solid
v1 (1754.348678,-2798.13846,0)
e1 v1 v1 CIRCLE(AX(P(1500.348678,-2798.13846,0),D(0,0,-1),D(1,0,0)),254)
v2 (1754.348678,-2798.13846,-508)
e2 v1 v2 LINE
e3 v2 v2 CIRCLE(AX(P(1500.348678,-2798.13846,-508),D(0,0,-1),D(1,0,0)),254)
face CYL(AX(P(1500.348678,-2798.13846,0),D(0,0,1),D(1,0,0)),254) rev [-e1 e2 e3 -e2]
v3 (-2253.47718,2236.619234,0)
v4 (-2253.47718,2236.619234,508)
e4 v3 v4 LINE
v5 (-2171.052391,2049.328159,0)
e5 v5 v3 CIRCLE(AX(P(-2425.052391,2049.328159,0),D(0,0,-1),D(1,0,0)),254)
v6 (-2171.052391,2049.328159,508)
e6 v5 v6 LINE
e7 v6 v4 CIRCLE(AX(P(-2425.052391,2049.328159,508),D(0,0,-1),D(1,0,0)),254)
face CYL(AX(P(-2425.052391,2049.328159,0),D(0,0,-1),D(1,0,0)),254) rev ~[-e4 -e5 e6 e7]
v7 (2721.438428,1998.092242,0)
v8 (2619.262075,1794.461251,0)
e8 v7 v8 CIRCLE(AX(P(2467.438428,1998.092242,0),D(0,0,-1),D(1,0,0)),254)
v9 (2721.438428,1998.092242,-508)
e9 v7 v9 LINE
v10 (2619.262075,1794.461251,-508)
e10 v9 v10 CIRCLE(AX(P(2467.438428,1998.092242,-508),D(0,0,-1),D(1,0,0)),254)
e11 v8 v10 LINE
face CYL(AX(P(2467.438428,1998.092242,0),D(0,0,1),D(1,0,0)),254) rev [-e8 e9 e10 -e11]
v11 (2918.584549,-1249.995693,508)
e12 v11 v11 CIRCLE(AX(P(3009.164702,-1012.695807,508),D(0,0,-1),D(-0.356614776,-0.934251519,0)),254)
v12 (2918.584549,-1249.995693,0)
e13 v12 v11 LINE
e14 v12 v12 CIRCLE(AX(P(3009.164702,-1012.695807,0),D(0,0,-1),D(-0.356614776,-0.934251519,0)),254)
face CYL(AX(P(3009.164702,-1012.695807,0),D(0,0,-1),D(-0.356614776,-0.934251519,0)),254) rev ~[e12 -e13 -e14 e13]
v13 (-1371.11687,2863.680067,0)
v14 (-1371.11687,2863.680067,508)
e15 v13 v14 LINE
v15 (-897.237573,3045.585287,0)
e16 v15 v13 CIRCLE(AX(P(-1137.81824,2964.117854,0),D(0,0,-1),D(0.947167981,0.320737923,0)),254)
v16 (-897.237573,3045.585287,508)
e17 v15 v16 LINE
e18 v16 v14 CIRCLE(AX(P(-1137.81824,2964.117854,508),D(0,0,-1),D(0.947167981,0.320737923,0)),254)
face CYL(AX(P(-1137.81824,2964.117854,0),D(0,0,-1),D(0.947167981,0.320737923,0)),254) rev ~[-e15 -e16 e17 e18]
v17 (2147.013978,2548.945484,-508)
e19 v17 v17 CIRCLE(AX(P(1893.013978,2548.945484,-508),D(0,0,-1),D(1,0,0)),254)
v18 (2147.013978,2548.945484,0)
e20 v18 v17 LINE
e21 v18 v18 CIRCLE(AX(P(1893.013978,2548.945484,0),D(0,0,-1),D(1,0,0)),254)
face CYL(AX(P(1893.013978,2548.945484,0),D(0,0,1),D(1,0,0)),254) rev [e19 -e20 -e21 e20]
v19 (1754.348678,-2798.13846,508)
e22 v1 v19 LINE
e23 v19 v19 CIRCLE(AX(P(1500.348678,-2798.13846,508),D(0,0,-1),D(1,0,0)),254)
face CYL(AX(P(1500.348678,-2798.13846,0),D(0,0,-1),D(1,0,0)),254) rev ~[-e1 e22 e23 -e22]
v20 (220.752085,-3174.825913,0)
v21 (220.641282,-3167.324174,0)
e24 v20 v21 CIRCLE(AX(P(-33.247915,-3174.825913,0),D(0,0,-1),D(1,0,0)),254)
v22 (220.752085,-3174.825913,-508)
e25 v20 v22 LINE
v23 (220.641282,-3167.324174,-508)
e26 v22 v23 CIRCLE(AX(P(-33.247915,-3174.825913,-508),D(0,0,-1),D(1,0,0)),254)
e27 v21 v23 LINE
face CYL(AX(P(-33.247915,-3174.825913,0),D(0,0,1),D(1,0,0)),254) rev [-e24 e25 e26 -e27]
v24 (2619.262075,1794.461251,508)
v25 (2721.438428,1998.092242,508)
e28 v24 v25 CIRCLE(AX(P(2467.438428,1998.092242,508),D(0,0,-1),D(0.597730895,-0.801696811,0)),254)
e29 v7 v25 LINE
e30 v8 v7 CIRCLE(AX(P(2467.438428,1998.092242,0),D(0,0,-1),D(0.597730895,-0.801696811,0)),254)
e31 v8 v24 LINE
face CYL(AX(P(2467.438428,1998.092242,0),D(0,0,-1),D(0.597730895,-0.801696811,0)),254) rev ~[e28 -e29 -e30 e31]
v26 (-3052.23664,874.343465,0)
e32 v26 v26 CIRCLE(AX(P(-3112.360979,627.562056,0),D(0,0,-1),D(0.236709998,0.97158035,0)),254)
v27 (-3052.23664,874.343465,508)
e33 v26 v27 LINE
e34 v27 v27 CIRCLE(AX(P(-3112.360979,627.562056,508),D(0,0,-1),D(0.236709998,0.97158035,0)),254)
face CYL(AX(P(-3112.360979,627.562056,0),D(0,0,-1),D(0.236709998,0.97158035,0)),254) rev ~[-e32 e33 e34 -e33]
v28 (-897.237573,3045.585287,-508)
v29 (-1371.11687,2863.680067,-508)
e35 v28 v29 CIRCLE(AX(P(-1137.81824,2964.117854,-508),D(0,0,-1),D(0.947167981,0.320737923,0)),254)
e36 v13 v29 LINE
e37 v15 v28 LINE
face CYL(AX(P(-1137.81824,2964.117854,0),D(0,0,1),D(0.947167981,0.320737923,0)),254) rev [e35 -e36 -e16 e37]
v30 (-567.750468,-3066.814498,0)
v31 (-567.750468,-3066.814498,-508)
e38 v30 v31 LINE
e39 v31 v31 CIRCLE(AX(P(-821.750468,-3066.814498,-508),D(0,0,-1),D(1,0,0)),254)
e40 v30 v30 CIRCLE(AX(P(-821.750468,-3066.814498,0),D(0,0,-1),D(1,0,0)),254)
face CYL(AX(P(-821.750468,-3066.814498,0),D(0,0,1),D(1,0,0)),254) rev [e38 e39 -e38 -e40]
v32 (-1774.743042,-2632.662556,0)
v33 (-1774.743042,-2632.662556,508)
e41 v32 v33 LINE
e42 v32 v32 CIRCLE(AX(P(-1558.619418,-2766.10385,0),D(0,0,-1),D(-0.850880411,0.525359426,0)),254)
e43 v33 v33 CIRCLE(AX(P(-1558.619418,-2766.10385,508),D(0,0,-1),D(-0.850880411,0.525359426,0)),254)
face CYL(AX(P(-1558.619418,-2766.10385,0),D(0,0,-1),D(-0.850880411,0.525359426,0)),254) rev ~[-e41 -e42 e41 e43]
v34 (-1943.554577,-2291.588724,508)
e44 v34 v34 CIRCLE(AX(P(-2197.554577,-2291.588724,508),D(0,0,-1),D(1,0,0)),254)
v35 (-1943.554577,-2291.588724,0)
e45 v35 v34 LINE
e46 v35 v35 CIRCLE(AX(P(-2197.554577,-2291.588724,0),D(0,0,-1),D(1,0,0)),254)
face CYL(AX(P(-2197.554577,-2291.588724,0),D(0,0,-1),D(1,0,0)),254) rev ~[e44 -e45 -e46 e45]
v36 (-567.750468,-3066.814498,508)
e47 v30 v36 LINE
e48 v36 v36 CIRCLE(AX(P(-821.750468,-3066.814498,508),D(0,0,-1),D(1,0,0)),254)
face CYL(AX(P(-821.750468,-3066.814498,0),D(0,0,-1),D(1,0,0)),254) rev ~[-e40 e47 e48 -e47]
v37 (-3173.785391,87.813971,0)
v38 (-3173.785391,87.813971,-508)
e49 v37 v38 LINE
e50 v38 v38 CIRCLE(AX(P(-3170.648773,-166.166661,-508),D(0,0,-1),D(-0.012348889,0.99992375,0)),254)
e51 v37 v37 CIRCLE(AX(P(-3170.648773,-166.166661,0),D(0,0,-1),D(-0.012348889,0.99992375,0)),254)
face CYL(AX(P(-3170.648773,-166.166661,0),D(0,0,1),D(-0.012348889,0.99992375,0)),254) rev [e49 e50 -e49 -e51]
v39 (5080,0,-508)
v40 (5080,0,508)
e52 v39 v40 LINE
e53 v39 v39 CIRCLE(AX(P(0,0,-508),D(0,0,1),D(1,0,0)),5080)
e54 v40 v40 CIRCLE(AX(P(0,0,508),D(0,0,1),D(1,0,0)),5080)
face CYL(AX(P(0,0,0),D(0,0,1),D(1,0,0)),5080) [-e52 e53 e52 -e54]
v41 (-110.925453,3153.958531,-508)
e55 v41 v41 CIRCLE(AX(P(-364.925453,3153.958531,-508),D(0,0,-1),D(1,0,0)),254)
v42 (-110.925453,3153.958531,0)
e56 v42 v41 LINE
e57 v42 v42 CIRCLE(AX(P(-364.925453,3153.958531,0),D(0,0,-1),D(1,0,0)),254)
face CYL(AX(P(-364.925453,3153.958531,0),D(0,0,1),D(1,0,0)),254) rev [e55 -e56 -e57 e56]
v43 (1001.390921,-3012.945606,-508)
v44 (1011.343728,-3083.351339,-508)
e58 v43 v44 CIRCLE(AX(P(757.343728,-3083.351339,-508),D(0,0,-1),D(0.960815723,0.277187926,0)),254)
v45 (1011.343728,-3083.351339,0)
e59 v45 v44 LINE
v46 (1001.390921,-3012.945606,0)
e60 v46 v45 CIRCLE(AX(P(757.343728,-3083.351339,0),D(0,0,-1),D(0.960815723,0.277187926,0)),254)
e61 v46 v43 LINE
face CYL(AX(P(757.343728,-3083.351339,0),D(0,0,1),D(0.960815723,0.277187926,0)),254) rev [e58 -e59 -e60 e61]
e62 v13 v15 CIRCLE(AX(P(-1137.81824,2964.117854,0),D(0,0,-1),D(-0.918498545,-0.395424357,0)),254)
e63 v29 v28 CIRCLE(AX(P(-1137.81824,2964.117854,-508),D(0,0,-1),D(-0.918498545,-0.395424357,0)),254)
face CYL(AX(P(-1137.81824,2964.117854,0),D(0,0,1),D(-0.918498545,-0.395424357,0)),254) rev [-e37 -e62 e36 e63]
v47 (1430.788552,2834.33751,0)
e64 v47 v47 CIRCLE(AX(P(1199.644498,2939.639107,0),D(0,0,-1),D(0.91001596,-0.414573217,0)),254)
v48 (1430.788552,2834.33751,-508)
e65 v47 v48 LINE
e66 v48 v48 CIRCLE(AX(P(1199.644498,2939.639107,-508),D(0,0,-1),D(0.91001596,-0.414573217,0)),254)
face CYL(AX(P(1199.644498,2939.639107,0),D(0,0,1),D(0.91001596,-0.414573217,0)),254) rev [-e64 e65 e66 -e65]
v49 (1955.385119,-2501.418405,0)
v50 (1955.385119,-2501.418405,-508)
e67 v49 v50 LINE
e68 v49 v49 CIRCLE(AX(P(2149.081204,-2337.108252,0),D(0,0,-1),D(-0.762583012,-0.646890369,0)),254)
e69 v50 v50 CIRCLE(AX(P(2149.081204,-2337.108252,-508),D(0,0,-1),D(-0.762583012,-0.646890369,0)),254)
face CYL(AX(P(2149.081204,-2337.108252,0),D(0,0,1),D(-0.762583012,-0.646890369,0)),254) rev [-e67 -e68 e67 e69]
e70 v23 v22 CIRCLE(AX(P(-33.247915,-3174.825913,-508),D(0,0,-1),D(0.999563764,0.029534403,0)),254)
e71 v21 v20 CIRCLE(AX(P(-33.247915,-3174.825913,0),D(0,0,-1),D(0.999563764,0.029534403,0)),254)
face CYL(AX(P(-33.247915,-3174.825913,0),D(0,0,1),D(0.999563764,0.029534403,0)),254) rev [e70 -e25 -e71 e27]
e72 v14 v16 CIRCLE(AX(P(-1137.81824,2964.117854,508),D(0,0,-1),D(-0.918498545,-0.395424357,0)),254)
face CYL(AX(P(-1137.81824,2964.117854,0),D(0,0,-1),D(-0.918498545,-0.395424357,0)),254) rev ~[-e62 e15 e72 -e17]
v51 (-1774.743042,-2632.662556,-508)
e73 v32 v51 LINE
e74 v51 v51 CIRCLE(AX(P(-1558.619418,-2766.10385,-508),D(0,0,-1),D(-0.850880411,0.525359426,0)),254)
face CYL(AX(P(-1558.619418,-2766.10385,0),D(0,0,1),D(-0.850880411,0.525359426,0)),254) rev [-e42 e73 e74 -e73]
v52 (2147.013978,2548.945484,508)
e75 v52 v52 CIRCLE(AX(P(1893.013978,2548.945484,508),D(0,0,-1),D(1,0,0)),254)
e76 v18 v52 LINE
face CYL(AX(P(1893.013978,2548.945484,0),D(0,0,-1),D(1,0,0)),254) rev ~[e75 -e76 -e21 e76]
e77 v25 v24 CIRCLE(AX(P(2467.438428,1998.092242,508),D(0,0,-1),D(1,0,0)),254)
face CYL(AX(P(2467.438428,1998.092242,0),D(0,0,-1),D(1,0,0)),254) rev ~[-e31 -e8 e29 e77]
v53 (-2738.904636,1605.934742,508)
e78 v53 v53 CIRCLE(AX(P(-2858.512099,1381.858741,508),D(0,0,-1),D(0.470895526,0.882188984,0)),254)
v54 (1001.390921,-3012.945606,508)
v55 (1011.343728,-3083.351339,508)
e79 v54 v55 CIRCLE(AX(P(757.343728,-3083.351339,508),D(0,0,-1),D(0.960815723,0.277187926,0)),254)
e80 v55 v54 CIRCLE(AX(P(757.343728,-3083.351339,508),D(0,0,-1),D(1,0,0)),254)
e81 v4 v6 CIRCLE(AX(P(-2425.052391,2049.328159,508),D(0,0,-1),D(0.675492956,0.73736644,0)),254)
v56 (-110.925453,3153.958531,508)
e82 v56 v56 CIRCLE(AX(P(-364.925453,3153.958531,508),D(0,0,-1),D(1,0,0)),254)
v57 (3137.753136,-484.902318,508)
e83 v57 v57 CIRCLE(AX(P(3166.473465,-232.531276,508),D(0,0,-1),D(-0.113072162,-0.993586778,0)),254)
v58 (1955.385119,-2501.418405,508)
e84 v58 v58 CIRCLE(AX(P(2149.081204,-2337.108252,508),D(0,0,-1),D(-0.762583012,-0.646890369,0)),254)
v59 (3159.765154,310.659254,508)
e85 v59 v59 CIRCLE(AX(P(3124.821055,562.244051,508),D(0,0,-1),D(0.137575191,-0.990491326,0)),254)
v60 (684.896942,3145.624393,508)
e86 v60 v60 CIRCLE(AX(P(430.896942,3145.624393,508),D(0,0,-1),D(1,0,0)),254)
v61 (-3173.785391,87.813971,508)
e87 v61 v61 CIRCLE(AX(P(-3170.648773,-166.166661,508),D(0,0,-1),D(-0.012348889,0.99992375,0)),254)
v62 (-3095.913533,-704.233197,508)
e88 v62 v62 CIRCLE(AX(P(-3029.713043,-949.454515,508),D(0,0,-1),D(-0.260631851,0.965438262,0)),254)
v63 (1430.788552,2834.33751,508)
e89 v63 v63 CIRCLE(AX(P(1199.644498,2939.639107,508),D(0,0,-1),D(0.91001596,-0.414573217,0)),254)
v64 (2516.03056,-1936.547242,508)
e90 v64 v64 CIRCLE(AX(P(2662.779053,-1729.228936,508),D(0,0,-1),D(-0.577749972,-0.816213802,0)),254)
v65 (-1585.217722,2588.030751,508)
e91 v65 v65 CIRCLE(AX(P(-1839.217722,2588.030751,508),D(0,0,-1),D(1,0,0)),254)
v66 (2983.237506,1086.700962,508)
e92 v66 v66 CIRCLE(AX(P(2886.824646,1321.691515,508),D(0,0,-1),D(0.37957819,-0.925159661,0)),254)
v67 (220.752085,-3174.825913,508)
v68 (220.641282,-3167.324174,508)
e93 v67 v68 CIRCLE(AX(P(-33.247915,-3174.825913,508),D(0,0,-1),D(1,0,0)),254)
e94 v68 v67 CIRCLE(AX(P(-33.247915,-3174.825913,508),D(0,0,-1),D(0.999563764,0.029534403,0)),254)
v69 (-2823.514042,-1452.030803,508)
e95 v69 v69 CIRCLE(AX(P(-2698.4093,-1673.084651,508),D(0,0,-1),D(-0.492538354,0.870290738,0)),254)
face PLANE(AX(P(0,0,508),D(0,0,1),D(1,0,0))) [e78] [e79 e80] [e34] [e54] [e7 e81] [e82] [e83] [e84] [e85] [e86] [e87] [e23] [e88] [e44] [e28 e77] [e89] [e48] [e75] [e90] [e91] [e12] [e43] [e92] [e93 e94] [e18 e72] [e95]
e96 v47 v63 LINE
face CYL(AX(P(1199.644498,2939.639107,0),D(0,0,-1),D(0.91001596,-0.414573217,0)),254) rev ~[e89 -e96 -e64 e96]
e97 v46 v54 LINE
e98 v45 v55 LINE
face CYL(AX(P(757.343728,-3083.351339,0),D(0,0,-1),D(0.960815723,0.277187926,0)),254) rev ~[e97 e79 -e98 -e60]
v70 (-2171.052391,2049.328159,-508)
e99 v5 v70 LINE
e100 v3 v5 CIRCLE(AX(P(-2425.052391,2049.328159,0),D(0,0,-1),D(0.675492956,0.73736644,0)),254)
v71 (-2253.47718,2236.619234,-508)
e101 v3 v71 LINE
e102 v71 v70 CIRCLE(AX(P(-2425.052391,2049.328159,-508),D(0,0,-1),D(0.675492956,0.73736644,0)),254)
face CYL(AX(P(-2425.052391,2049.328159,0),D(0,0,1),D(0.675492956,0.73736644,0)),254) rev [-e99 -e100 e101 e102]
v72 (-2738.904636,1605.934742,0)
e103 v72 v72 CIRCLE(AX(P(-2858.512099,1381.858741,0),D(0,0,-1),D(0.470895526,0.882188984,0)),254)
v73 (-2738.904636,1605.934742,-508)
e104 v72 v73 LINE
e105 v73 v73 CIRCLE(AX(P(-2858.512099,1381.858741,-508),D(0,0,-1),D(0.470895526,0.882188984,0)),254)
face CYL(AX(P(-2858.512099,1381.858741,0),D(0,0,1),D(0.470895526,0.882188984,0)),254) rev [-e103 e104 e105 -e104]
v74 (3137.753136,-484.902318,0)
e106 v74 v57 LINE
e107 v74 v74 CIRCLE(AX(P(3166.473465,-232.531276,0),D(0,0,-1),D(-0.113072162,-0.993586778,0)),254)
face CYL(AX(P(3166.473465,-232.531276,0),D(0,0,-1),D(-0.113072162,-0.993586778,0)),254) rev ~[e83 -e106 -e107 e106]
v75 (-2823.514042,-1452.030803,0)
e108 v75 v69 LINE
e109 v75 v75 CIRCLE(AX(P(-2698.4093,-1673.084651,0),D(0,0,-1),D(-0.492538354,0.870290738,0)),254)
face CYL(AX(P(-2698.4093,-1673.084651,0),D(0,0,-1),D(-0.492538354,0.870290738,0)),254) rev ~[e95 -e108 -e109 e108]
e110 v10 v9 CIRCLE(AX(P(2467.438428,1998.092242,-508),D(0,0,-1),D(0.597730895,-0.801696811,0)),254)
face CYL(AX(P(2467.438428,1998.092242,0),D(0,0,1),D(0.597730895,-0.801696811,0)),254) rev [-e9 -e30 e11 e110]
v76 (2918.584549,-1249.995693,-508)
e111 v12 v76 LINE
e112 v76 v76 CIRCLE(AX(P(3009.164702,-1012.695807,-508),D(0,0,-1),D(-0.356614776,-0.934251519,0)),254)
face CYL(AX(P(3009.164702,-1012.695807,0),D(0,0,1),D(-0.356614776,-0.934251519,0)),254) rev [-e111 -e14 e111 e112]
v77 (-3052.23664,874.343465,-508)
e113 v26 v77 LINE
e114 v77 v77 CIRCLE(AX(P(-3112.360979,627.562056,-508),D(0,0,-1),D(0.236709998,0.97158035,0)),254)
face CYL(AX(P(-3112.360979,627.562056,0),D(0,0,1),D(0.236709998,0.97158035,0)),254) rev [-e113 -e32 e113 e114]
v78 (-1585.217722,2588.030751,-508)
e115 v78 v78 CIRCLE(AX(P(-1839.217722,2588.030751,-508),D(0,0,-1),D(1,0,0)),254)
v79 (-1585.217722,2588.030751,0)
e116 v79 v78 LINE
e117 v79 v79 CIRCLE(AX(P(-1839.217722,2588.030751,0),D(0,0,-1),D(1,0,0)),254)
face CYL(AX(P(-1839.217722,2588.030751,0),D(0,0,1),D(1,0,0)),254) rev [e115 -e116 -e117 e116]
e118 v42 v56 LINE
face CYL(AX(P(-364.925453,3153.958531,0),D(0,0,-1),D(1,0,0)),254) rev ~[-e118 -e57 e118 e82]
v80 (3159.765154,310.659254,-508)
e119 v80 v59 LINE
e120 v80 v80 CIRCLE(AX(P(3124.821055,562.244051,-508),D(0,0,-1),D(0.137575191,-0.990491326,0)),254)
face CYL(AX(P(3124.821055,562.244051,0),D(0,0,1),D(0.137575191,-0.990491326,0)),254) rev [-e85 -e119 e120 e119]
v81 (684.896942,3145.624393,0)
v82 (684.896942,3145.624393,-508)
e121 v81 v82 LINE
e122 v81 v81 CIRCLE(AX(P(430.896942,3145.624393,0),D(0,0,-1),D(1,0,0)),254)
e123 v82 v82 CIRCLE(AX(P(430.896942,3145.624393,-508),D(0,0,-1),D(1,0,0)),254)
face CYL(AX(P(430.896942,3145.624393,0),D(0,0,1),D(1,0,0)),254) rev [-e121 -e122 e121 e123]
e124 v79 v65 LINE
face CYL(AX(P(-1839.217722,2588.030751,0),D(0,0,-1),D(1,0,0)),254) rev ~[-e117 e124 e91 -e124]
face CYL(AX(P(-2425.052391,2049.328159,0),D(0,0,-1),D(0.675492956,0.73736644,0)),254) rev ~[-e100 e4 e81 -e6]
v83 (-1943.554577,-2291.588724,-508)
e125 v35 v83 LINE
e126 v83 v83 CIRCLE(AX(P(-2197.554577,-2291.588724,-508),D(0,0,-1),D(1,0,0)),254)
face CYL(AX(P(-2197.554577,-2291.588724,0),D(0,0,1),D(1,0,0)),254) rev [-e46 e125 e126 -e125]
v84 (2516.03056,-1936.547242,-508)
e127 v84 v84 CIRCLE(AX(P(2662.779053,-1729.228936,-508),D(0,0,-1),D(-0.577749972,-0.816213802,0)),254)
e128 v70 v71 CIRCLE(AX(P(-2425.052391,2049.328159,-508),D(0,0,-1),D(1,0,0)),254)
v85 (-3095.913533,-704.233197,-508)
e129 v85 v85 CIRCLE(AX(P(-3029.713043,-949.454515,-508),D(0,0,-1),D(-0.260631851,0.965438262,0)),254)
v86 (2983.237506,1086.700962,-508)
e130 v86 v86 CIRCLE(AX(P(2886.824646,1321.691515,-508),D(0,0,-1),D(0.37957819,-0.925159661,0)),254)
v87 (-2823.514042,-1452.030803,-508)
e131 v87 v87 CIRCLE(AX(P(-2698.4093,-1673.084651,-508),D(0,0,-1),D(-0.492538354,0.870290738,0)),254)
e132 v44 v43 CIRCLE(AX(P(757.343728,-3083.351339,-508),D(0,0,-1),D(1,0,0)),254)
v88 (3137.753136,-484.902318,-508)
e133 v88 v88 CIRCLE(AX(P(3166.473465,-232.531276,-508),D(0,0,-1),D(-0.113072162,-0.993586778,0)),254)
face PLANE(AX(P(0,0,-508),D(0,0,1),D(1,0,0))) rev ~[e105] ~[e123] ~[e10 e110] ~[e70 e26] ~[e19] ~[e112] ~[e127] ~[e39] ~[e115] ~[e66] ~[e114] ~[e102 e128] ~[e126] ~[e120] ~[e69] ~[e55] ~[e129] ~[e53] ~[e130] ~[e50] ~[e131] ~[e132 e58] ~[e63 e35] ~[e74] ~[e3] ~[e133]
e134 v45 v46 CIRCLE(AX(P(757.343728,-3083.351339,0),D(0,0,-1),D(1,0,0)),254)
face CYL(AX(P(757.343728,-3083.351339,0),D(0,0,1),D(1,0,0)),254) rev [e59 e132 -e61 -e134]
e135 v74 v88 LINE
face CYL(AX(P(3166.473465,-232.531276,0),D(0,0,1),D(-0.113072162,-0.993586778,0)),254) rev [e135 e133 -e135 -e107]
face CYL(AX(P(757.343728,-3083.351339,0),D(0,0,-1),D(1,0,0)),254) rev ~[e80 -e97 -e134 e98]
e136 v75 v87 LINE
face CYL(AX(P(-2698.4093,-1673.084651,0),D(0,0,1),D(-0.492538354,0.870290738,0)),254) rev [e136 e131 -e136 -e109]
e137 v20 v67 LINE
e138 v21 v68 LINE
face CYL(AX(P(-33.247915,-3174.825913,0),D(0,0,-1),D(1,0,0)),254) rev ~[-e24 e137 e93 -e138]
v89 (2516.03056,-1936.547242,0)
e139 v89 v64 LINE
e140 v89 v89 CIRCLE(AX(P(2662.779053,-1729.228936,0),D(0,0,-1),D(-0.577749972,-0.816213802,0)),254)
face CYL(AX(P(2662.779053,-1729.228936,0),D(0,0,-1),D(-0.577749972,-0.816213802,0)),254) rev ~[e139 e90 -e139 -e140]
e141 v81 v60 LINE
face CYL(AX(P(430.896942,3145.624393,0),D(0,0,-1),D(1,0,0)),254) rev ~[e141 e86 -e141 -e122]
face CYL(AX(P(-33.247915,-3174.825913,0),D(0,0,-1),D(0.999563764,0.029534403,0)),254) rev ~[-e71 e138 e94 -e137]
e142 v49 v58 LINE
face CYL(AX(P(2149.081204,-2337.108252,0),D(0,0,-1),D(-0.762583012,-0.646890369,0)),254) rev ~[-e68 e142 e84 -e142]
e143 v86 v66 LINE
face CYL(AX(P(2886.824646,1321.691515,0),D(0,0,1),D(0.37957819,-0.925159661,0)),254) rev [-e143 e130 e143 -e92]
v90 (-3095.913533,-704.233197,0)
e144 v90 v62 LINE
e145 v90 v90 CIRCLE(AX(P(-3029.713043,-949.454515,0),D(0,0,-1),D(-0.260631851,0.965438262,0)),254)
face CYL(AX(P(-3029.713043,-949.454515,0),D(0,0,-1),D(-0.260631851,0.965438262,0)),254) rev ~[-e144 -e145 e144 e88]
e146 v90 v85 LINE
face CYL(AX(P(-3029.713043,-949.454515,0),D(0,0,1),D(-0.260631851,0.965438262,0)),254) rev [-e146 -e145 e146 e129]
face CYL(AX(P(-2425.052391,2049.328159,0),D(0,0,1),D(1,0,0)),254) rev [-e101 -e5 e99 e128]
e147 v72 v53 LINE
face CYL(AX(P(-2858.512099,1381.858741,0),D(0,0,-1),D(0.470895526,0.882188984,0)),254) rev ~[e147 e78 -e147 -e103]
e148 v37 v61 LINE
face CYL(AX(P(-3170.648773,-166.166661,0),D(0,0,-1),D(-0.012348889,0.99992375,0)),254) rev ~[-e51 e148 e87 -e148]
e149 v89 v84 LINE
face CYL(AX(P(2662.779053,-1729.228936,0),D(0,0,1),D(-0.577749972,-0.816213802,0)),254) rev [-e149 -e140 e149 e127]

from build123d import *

# Parameters (mm, degrees)
F0_R     = 5080
F1_DEPTH = 508


# Not quite as in the source:
# - a feature names something its author has since deleted; it is built from what else it names


with BuildPart() as f1:
    # F0 (on Top) → F1 (new body, symmetric)
    with BuildSketch(Plane.XY):
        Circle(F0_R)
        with BuildLine():
            ThreePointArc((3159.7651539423, 310.6592537359), (3170.6487728458, 166.1666610714), (3174.9283642102, 21.3279659893))
            ThreePointArc((3174.9283642102, 21.3279659892), (3349.0433755669, -55.9407103788), (3420.4734651877, -232.5312758802))
            ThreePointArc((3420.4734651877, -232.5312758802), (3335.6199052673, -422.018694482), (3137.7531359879, -484.902317584))
            ThreePointArc((3137.7531359879, -484.902317584), (3112.360979424, -627.5620557037), (3080.486200819, -768.9146679337))
            ThreePointArc((3080.486200819, -768.9146679337), (3212.4276604766, -860.3797880933), (3263.1647017804, -1012.6958070214))
            ThreePointArc((3263.1647017804, -1012.6958070214), (3153.2283007654, -1221.8887310114), (2918.5845486504, -1249.9956929441))
            ThreePointArc((2918.5845486504, -1249.9956929442), (2858.512099202, -1381.8587405071), (2792.4857601946, -1510.8435653999))
            ThreePointArc((2792.4857601946, -1510.8435654), (2883.5294819577, -1603.5895784257), (2916.7790532267, -1729.2289361727))
            ThreePointArc((2916.7790532267, -1729.2289361727), (2779.4878421015, -1954.8282681739), (2516.0305603182, -1936.547241754))
            ThreePointArc((2516.0305603182, -1936.5472417539), (2425.052390915, -2049.3281585235), (2329.0231692129, -2157.8406051582))
            ThreePointArc((2329.0231692129, -2157.8406051582), (2383.8377363773, -2240.1269627642), (2403.0812037424, -2337.1082516052))
            ThreePointArc((2403.0812037424, -2337.1082516052), (2236.5946151881, -2575.5561553853), (1955.385118568, -2501.4184052418))
            ThreePointArc((1955.385118568, -2501.4184052419), (1839.217722188, -2588.0307514382), (1719.2194869615, -2669.2525837118))
            ThreePointArc((1719.2194869615, -2669.2525837117), (1745.4090642416, -2731.3446932303), (1754.3486784592, -2798.1384603063))
            ThreePointArc((1754.3486784592, -2798.1384603063), (1557.2865736992, -3045.674469981), (1271.8756384148, -2909.116250755))
            ThreePointArc((1271.8756384147, -2909.116250755), (1137.8182398063, -2964.1178541286), (1001.3909214974, -3012.9456056064))
            ThreePointArc((1001.3909214974, -3012.9456056064), (1008.843218066, -3047.7984710094), (1011.343727812, -3083.3513387131))
            ThreePointArc((1011.343727812, -3083.3513387131), (782.8081622254, -3336.0716635388), (508.4495342686, -3134.0236232521))
            ThreePointArc((508.4495342686, -3134.0236232521), (364.9254528148, -3153.9585307813), (220.6412815773, -3167.3241742619))
            ThreePointArc((220.6412815773, -3167.3241742619), (220.7243829568, -3171.0746343661), (220.7520854309, -3174.8259127355))
            ThreePointArc((220.7520854309, -3174.8259127355), (-39.6585303247, -3428.745002222), (-286.9243240623, -3162.0087653676))
            ThreePointArc((-286.9243240623, -3162.0087653676), (-430.8969424789, -3145.6243934968), (-573.972061526, -3122.6881164451))
            ThreePointArc((-573.9720615261, -3122.6881164451), (-887.4905056565, -3312.1596583452), (-1064.2696718785, -2991.3132677003))
            ThreePointArc((-1064.2696718784, -2991.3132677003), (-1199.6444981486, -2939.6391067717), (-1332.5206290822, -2881.8420798285))
            ThreePointArc((-1332.5206290822, -2881.8420798285), (-1683.3089711463, -2987.3921583311), (-1774.7430421005, -2632.6625561427))
            ThreePointArc((-1774.7430421005, -2632.6625561427), (-1893.0139780159, -2548.9454837318), (-2007.3420248451, -2459.9193066625))
            ThreePointArc((-2007.342024845, -2459.9193066625), (-2373.3589432016, -2474.9158221493), (-2373.702779939, -2108.5919739271))
            ThreePointArc((-2373.7027799391, -2108.591973927), (-2467.4384276259, -1998.0922415832), (-2556.0347386993, -1883.4307565086))
            ThreePointArc((-2556.0347386993, -1883.4307565086), (-2914.282044252, -1806.9314227581), (-2823.5140422458, -1452.0308031309))
            ThreePointArc((-2823.5140422458, -1452.0308031309), (-2886.8246462244, -1321.6915154268), (-2944.1223894829, -1188.5993251494))
            ThreePointArc((-2944.1223894829, -1188.5993251494), (-3272.0900864823, -1025.4108766461), (-3095.91353312, -704.2331967781))
            ThreePointArc((-3095.91353312, -704.2331967781), (-3124.8210553023, -562.2440505147), (-3147.2200028105, -419.0838268286))
            ThreePointArc((-3147.2200028105, -419.0838268285), (-3424.3006746734, -179.4599939571), (-3173.7853907348, 87.8139713167))
            ThreePointArc((-3173.7853907348, 87.8139713168), (-3166.4734651876, 232.5312758803), (-3152.5662086961, 376.7642496146))
            ThreePointArc((-3152.5662086961, 376.7642496145), (-3361.3498577779, 677.76702016), (-3052.2366398835, 874.3434646365))
            ThreePointArc((-3052.2366398835, 874.3434646365), (-3009.1647017804, 1012.6958070214), (-2959.8250853618, 1148.9388426122))
            ThreePointArc((-2959.8250853618, 1148.9388426122), (-3087.1930671381, 1492.4074397477), (-2738.9046356072, 1605.9347424628))
            ThreePointArc((-2738.9046356072, 1605.9347424629), (-2662.7790532267, 1729.2289361727), (-2581.107266439, 1848.9213826271))
            ThreePointArc((-2581.107266439, 1848.9213826271), (-2619.0565821882, 2213.2744112054), (-2253.4771800891, 2236.6192342054))
            ThreePointArc((-2253.4771800891, 2236.6192342054), (-2149.0812037424, 2337.1082516052), (-2040.2089853173, 2432.7293923144))
            ThreePointArc((-2040.2089853173, 2432.7293923144), (-1986.355139963, 2795.0732115532), (-1626.4554656367, 2726.7687137527))
            ThreePointArc((-1626.4554656367, 2726.7687137527), (-1500.3486784592, 2798.1384603064), (-1371.1168702844, 2863.6800673297))
            ThreePointArc((-1371.1168702844, 2863.6800673297), (-1228.8436989908, 3201.2472824589), (-897.2375725935, 3045.5852866611))
            ThreePointArc((-897.2375725935, 3045.5852866611), (-757.343727812, 3083.3513387131), (-615.8724396764, 3114.6951918361))
            ThreePointArc((-615.8724396764, 3114.6951918361), (-394.11948904, 3406.2752132438), (-111.6429430553, 3173.0365351294))
            ThreePointArc((-111.6429430552, 3173.0365351294), (33.2479145692, 3174.8259127355), (178.0695213369, 3170.0025623918))
            ThreePointArc((178.0695213369, 3170.0025623918), (443.1001189081, 3399.3310794258), (684.8969424789, 3145.6243934968))
            ThreePointArc((684.8969424789, 3145.6243934968), (683.9124547508, 3123.2827160797), (680.9666231891, 3101.1142284834))
            ThreePointArc((680.9666231891, 3101.1142284834), (821.7504682005, 3066.8144984678), (960.8227194307, 3026.1270134986))
            ThreePointArc((960.8227194307, 3026.1270134986), (1243.5493282112, 3189.815776142), (1453.6444981486, 2939.6391067717))
            ThreePointArc((1453.6444981486, 2939.6391067717), (1447.8647528602, 2885.7623478592), (1430.7885520784, 2834.3375097615))
            ThreePointArc((1430.7885520784, 2834.3375097615), (1558.619417728, 2766.1038503066), (1683.2038924038, 2692.1087750306))
            ThreePointArc((1683.2038924039, 2692.1087750306), (1967.9280563141, 2791.6467010191), (2147.0139780158, 2548.9454837318))
            ThreePointArc((2147.0139780158, 2548.9454837318), (2132.5243934708, 2464.3833119964), (2090.7087741685, 2389.4689413371))
            ThreePointArc((2090.7087741685, 2389.4689413372), (2197.5545770385, 2291.5887242123), (2299.8231744264, 2188.9354413438))
            ThreePointArc((2299.8231744264, 2188.9354413439), (2572.1803143936, 2229.4904636082), (2721.4384276259, 1998.0922415832))
            ThreePointArc((2721.4384276259, 1998.0922415832), (2694.4617814958, 1884.1782529882), (2619.2620748886, 1794.4612514765))
            ThreePointArc((2619.2620748885, 1794.4612514766), (2698.4093002333, 1673.084650702), (2771.9361082418, 1548.2232435361))
            ThreePointArc((2771.9361082418, 1548.2232435361), (3019.7424993376, 1538.1374539976), (3140.8246462244, 1321.6915154268))
            ThreePointArc((3140.8246462244, 1321.6915154268), (3097.7806446017, 1180.2222016211), (2983.2375064713, 1086.7009616187))
            ThreePointArc((2983.2375064713, 1086.7009616187), (3029.7130430392, 949.4545154131), (3069.8781019084, 810.2304853702))
            ThreePointArc((3069.8781019084, 810.2304853702), (3283.818680816, 760.3242238815), (3378.8210553023, 562.2440505147))
            ThreePointArc((3378.8210553023, 562.2440505147), (3316.3827960735, 395.4504670868), (3159.7651539423, 310.6592537359))
        make_face(mode=Mode.SUBTRACT)
        with BuildLine():
            ThreePointArc((3137.7531359879, -484.902317584), (2913.1555879726, -213.9287738098), (3174.9283642102, 21.3279659892))
            ThreePointArc((3174.9283642102, 21.3279659893), (3170.6487728458, 166.1666610714), (3159.7651539423, 310.6592537359))
            ThreePointArc((3159.7651539423, 310.6592537359), (2874.8353708782, 517.2645264735), (3069.8781019084, 810.2304853702))
            ThreePointArc((3069.8781019084, 810.2304853702), (3029.7130430392, 949.4545154131), (2983.2375064713, 1086.7009616187))
            ThreePointArc((2983.2375064713, 1086.7009616187), (2655.8786745265, 1215.9561941926), (2771.9361082418, 1548.2232435361))
            ThreePointArc((2771.9361082418, 1548.2232435361), (2698.4093002333, 1673.084650702), (2619.2620748885, 1794.4612514766))
            ThreePointArc((2619.2620748886, 1794.4612514765), (2270.0433534158, 1838.2448622566), (2299.8231744264, 2188.9354413439))
            ThreePointArc((2299.8231744264, 2188.9354413438), (2197.5545770385, 2291.5887242123), (2090.7087741685, 2389.4689413372))
            ThreePointArc((2090.7087741685, 2389.4689413371), (1741.5728597746, 2345.0298450332), (1683.2038924039, 2692.1087750306))
            ThreePointArc((1683.2038924038, 2692.1087750306), (1558.619417728, 2766.1038503066), (1430.7885520784, 2834.3375097615))
            ThreePointArc((1430.7885520784, 2834.3375097615), (1103.6729382967, 2704.46797823), (960.8227194307, 3026.1270134986))
            ThreePointArc((960.8227194307, 3026.1270134986), (821.7504682005, 3066.8144984678), (680.9666231891, 3101.1142284834))
            ThreePointArc((680.9666231891, 3101.1142284834), (396.4251870806, 2893.9744420171), (178.0695213369, 3170.0025623918))
            ThreePointArc((178.0695213369, 3170.0025623918), (33.2479145692, 3174.8259127355), (-111.6429430552, 3173.0365351294))
            ThreePointArc((-111.6429430553, 3173.0365351294), (-111.1048887554, 3163.5042764587), (-110.9254528149, 3153.9585307813))
            ThreePointArc((-110.9254528149, 3153.9585307813), (-345.2345242287, 2900.7229342878), (-615.8724396764, 3114.6951918361))
            ThreePointArc((-615.8724396764, 3114.6951918361), (-757.343727812, 3083.3513387131), (-897.2375725935, 3045.5852866611))
            ThreePointArc((-897.2375725935, 3045.5852866611), (-887.1955258795, 3005.4004807889), (-883.8182398063, 2964.1178541286))
            ThreePointArc((-883.8182398063, 2964.1178541286), (-1086.5437439113, 2715.3470237029), (-1371.1168702844, 2863.6800673297))
            ThreePointArc((-1371.1168702844, 2863.6800673297), (-1500.3486784592, 2798.1384603064), (-1626.4554656367, 2726.7687137527))
            ThreePointArc((-1626.4554656367, 2726.7687137527), (-1595.7453283073, 2660.3992073978), (-1585.217722188, 2588.0307514382))
            ThreePointArc((-1585.217722188, 2588.0307514382), (-1757.1682884144, 2347.6479516845), (-2040.2089853173, 2432.7293923144))
            ThreePointArc((-2040.2089853173, 2432.7293923144), (-2149.0812037424, 2337.1082516052), (-2253.4771800891, 2236.6192342054))
            ThreePointArc((-2253.4771800891, 2236.6192342054), (-2192.5700221752, 2151.6411500012), (-2171.052390915, 2049.3281585235))
            ThreePointArc((-2171.052390915, 2049.3281585235), (-2313.5219878473, 1821.1243697917), (-2581.107266439, 1848.9213826271))
            ThreePointArc((-2581.107266439, 1848.9213826271), (-2662.7790532267, 1729.2289361727), (-2738.9046356072, 1605.9347424629))
            ThreePointArc((-2738.9046356072, 1605.9347424628), (-2640.6861414363, 1512.5027305085), (-2604.512099202, 1381.8587405071))
            ThreePointArc((-2604.512099202, 1381.8587405071), (-2719.2596279216, 1169.4328728679), (-2959.8250853618, 1148.9388426122))
            ThreePointArc((-2959.8250853618, 1148.9388426122), (-3009.1647017804, 1012.6958070214), (-3052.2366398835, 874.3434646365))
            ThreePointArc((-3052.2366398835, 874.3434646365), (-2912.6266781094, 784.4767104635), (-2858.360979424, 627.5620557037))
            ThreePointArc((-2858.360979424, 627.5620557037), (-2947.5825345884, 434.2641919867), (-3152.5662086961, 376.7642496145))
            ThreePointArc((-3152.5662086961, 376.7642496146), (-3166.4734651876, 232.5312758803), (-3173.7853907348, 87.8139713168))
            ThreePointArc((-3173.7853907348, 87.8139713167), (-2992.1560572294, 14.5440206049), (-2916.6487728458, -166.1666610713))
            ThreePointArc((-2916.6487728458, -166.1666610713), (-2982.9430089639, -337.2880980847), (-3147.2200028105, -419.0838268285))
            ThreePointArc((-3147.2200028105, -419.0838268286), (-3124.8210553023, -562.2440505147), (-3095.91353312, -704.2331967781))
            ThreePointArc((-3095.91353312, -704.2331967781), (-2875.2768498728, -747.7977222216), (-2775.7130430392, -949.4545154131))
            ThreePointArc((-2775.7130430392, -949.4545154131), (-2822.0401921375, -1095.7008384381), (-2944.1223894829, -1188.5993251494))
            ThreePointArc((-2944.1223894829, -1188.5993251494), (-2886.8246462244, -1321.6915154268), (-2823.5140422458, -1452.0308031309))
            ThreePointArc((-2823.5140422458, -1452.0308031309), (-2570.4651805387, -1453.6619940879), (-2444.4093002333, -1673.084650702))
            ThreePointArc((-2444.4093002333, -1673.084650702), (-2474.0444872282, -1792.1494678613), (-2556.0347386993, -1883.4307565086))
            ThreePointArc((-2556.0347386993, -1883.4307565086), (-2467.4384276259, -1998.0922415832), (-2373.7027799391, -2108.591973927))
            ThreePointArc((-2373.702779939, -2108.5919739271), (-2098.1202860136, -2057.8606305471), (-1943.5545770385, -2291.5887242123))
            ThreePointArc((-1943.5545770385, -2291.5887242123), (-1960.0361690602, -2381.5943122134), (-2007.342024845, -2459.9193066625))
            ThreePointArc((-2007.3420248451, -2459.9193066625), (-1893.0139780159, -2548.9454837318), (-1774.7430421005, -2632.6625561427))
            ThreePointArc((-1774.7430421005, -2632.6625561427), (-1489.2630935413, -2521.7563512498), (-1304.6194177281, -2766.1038503066))
            ThreePointArc((-1304.6194177281, -2766.1038503066), (-1311.6932219569, -2825.63076726), (-1332.5206290822, -2881.8420798285))
            ThreePointArc((-1332.5206290822, -2881.8420798285), (-1199.6444981486, -2939.6391067717), (-1064.2696718784, -2991.3132677003))
            ThreePointArc((-1064.2696718785, -2991.3132677003), (-783.5659015158, -2815.7011000457), (-567.7504682005, -3066.8144984678))
            ThreePointArc((-567.7504682005, -3066.8144984678), (-569.3106582504, -3094.9239693334), (-573.9720615261, -3122.6881164451))
            ThreePointArc((-573.972061526, -3122.6881164451), (-430.8969424789, -3145.6243934968), (-286.9243240623, -3162.0087653676))
            ThreePointArc((-286.9243240623, -3162.0087653676), (-30.5880814035, -2920.8398397167), (220.6412815773, -3167.3241742619))
            ThreePointArc((220.6412815773, -3167.3241742619), (364.9254528148, -3153.9585307813), (508.4495342686, -3134.0236232521))
            ThreePointArc((508.4495342686, -3134.0236232521), (696.756229587, -2836.683231616), (1001.3909214974, -3012.9456056064))
            ThreePointArc((1001.3909214974, -3012.9456056064), (1137.8182398063, -2964.1178541286), (1271.8756384147, -2909.116250755))
            ThreePointArc((1271.8756384148, -2909.116250755), (1380.3207841825, -2574.2873834818), (1719.2194869615, -2669.2525837117))
            ThreePointArc((1719.2194869615, -2669.2525837118), (1839.217722188, -2588.0307514382), (1955.385118568, -2501.4184052419))
            ThreePointArc((1955.385118568, -2501.4184052418), (1977.1547074431, -2150.1395914767), (2329.0231692129, -2157.8406051582))
            ThreePointArc((2329.0231692129, -2157.8406051582), (2425.052390915, -2049.3281585235), (2516.0305603182, -1936.5472417539))
            ThreePointArc((2516.0305603182, -1936.547241754), (2449.7567289686, -1590.8906212789), (2792.4857601946, -1510.8435654))
            ThreePointArc((2792.4857601946, -1510.8435653999), (2858.512099202, -1381.8587405071), (2918.5845486504, -1249.9956929442))
            ThreePointArc((2918.5845486504, -1249.9956929441), (2768.431525638, -931.6801424597), (3080.486200819, -768.9146679337))
            ThreePointArc((3080.486200819, -768.9146679337), (3112.360979424, -627.5620557037), (3137.7531359879, -484.902317584))
        make_face()
    extrude(amount=F1_DEPTH, both=True)


solid = f1.part
